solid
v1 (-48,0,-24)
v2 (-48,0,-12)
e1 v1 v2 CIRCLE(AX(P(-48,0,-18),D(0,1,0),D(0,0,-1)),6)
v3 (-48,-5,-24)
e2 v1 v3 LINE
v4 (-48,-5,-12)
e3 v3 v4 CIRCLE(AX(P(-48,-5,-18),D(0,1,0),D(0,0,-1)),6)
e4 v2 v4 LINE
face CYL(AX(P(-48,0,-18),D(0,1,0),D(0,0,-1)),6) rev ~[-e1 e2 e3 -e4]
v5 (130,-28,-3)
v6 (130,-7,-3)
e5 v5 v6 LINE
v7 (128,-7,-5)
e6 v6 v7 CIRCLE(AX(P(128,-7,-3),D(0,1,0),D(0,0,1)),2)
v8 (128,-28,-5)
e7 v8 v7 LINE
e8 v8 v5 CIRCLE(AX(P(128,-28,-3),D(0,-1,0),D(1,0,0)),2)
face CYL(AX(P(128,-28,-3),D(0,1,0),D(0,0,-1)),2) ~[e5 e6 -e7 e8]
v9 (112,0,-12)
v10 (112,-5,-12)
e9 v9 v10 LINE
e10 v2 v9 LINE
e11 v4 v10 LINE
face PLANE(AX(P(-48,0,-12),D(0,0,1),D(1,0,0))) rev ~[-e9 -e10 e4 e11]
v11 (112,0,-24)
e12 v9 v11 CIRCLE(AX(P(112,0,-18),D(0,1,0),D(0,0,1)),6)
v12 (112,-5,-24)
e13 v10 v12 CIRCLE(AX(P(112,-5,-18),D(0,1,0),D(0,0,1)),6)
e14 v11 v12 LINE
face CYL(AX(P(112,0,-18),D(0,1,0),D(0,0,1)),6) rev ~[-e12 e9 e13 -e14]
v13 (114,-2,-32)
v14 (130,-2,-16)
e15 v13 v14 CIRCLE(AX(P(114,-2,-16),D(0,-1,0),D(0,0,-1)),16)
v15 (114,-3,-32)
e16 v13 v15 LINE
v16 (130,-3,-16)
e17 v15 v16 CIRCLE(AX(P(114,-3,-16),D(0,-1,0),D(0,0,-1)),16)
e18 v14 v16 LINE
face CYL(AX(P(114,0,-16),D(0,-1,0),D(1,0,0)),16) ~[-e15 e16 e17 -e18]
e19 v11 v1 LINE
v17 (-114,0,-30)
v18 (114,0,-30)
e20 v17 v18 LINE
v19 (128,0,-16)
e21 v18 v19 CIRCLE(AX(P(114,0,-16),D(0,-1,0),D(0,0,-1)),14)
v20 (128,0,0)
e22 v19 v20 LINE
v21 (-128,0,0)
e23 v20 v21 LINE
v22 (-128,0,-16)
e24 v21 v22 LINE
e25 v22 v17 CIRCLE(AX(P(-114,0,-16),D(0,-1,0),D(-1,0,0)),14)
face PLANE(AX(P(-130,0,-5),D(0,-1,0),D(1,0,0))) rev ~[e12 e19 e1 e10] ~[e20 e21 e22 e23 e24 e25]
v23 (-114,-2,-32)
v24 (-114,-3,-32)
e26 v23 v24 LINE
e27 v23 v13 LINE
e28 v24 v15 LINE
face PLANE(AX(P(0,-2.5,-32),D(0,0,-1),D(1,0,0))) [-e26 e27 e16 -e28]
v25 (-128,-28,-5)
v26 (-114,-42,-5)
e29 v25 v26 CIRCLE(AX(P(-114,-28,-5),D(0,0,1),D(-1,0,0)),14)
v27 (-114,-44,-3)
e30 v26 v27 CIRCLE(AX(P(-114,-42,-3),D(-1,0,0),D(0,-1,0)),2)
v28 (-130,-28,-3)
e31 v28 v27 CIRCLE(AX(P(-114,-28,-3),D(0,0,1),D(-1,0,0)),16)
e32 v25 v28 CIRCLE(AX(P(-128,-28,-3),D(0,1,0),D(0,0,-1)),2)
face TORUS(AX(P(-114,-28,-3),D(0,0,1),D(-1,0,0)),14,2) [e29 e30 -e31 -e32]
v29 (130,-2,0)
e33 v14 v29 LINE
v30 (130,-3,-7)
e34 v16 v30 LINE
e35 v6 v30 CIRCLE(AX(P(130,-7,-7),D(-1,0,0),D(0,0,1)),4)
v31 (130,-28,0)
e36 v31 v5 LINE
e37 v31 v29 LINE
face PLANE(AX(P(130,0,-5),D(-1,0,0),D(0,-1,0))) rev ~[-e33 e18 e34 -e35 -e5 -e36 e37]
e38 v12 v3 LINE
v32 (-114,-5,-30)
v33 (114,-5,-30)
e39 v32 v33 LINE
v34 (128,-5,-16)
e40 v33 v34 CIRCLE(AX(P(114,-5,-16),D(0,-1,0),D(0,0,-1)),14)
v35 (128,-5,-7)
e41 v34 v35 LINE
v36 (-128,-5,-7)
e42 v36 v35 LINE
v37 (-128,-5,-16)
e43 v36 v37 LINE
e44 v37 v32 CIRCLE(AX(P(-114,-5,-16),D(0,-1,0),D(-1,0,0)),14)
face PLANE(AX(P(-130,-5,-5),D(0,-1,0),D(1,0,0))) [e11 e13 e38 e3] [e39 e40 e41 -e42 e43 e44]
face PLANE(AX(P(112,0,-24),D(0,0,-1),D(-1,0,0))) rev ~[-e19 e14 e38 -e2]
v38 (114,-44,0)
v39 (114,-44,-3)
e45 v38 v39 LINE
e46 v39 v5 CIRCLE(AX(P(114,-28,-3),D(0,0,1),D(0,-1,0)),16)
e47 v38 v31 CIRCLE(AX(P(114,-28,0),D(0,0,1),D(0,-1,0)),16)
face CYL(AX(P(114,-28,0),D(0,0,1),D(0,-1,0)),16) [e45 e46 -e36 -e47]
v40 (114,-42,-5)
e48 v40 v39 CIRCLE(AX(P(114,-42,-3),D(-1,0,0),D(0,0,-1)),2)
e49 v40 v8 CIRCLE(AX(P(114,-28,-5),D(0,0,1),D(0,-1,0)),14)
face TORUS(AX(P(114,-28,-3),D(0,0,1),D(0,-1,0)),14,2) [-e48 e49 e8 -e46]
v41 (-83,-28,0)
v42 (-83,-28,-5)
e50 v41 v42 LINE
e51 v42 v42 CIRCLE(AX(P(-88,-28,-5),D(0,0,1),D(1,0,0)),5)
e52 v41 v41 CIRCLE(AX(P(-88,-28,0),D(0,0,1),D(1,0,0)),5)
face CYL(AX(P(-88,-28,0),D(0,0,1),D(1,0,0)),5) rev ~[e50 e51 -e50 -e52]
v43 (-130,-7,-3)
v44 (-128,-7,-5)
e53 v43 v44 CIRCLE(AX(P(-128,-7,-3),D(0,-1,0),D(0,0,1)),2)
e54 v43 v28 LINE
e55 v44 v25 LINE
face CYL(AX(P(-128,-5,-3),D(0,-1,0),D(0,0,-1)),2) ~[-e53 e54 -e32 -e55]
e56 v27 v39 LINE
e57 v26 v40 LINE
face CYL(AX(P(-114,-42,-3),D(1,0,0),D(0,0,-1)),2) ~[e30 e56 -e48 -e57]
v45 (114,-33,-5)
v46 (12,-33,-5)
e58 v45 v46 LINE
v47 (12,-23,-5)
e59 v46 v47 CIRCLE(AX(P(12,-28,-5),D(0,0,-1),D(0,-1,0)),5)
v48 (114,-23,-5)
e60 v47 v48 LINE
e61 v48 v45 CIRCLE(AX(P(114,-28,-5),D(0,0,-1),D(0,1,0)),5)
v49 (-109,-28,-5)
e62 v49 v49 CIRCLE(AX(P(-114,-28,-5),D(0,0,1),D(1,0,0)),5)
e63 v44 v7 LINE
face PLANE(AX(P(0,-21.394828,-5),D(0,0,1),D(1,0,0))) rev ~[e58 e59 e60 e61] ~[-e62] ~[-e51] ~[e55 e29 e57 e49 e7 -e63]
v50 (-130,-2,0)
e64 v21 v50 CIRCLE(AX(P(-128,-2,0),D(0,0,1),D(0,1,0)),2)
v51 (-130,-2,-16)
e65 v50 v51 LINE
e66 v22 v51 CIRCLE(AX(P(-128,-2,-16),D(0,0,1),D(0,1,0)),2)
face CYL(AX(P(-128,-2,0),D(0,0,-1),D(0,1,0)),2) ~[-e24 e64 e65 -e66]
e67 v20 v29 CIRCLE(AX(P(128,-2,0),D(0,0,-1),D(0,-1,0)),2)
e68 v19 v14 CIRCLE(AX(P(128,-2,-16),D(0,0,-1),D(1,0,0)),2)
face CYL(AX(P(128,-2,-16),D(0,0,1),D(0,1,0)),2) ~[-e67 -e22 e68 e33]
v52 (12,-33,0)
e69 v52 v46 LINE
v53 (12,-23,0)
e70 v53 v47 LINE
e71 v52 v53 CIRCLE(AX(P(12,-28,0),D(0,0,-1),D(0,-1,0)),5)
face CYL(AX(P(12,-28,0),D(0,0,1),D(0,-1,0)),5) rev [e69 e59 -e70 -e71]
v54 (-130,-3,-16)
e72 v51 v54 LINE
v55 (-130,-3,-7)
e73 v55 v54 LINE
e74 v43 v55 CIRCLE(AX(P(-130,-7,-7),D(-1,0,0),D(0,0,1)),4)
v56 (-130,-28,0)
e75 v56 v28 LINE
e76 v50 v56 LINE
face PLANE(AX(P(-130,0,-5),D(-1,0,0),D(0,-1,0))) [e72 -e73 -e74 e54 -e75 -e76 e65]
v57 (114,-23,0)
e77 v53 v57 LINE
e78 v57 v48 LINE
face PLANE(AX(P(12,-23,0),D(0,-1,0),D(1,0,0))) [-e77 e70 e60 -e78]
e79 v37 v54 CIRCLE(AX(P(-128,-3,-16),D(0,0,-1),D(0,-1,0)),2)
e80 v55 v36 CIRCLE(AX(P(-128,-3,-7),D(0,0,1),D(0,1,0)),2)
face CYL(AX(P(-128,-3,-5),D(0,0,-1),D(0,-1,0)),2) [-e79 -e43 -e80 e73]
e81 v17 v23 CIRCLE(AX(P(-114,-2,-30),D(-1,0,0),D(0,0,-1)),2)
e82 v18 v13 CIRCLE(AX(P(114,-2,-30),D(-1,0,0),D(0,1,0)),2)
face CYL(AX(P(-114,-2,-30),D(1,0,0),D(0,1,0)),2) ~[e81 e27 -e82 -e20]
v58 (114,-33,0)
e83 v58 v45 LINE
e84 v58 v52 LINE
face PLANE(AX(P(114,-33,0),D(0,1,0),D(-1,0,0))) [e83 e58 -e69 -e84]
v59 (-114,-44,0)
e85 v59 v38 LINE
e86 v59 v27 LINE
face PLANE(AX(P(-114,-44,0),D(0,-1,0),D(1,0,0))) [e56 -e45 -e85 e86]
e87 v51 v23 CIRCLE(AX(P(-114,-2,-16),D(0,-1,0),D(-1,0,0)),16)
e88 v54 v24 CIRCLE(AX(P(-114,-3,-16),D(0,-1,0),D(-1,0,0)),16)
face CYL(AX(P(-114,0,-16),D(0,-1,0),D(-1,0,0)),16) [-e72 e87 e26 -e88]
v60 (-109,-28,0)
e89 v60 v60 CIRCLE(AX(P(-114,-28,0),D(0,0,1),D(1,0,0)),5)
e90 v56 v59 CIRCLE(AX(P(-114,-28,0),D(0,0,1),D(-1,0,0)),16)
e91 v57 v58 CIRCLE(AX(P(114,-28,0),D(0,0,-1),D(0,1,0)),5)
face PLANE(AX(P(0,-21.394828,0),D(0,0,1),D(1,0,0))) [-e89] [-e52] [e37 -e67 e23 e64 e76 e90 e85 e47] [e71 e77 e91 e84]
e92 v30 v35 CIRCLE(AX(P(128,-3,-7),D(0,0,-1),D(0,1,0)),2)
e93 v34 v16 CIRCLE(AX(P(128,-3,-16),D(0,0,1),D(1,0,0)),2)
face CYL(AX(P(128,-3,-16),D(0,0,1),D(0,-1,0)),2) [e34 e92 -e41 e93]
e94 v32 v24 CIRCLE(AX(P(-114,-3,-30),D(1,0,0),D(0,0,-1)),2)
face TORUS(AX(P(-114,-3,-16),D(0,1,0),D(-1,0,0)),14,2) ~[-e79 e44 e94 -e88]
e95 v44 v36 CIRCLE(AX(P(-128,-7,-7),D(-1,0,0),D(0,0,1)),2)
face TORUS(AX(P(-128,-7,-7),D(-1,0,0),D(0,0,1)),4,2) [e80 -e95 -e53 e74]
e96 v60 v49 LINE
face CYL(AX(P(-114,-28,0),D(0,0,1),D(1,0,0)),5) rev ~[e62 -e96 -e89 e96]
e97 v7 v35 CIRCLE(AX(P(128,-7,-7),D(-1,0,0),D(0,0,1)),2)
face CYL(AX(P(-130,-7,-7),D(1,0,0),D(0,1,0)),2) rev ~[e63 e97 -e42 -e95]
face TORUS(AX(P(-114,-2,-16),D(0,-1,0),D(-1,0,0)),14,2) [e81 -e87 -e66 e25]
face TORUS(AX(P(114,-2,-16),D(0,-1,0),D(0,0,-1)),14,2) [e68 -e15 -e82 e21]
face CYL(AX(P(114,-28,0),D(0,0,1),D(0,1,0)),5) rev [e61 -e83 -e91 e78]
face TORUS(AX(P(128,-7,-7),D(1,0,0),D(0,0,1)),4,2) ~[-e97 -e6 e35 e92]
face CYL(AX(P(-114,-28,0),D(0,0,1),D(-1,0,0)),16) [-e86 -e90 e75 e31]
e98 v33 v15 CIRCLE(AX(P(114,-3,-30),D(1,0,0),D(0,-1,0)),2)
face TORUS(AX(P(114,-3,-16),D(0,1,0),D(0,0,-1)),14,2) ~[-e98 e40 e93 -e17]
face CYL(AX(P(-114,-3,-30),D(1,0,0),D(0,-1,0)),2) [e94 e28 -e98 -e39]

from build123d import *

# Parameters (mm, degrees)
F0_R     = 5
F1_DEPTH = 5
F2_W     = 260
F2_H     = 5
F3_DEPTH = 27
F4_R     = 16
F6_DEPTH = 5
F7_R     = 2


with BuildPart() as f1:
    # F0 (on Top) → F1 (new body)
    with BuildSketch(Plane.XY):
        with BuildLine():
            Line((130, -28), (130, 0))
            Line((130, 0), (-130, 0))
            Line((-130, 0), (-130, -28))
            ThreePointArc((-130, -28), (-125.313708499, -39.313708499), (-114, -44))
            Line((-114, -44), (114, -44))
            ThreePointArc((114, -44), (125.313708499, -39.313708499), (130, -28))
        make_face()
        with Locations((-114, -28)):
            Circle(F0_R, mode=Mode.SUBTRACT)
        with Locations((-88, -28)):
            Circle(F0_R, mode=Mode.SUBTRACT)
        with BuildLine():
            Line((12, -23), (114, -23))
            ThreePointArc((114, -23), (119, -28), (114, -33))
            Line((114, -33), (12, -33))
            ThreePointArc((12, -33), (7, -28), (12, -23))
        make_face(mode=Mode.SUBTRACT)
    extrude(amount=-F1_DEPTH)

    # F2 (on face) → F3 (join)
    with BuildSketch(Plane(origin=(0, 0, -5), x_dir=(1, 0, 0), z_dir=(0, 0, -1))):
        with Locations((0, 2.5)):
            Rectangle(F2_W, F2_H)
    extrude(amount=F3_DEPTH)

    # F4
    f4_edges = [f1.edges().sort_by_distance(p)[0] for p in [
        (130, -2.5, -32),
        (-130, -2.5, -32),
    ]]
    fillet(f4_edges, radius=F4_R)

    # F5 (on face) → F6 (cut)
    with BuildSketch(Plane(origin=(0, 0, 0), x_dir=(-1, 0, 0), z_dir=(0, 1, 0))):
        with BuildLine():
            ThreePointArc((48, -24), (54, -18), (48, -12))
            Line((48, -12), (-112, -12))
            ThreePointArc((-112, -12), (-118, -18), (-112, -24))
            Line((-112, -24), (48, -24))
        make_face()
    extrude(amount=-F6_DEPTH, mode=Mode.SUBTRACT)

    # F7
    f7_edges = [f1.edges().sort_by_distance(p)[0] for p in [
        (0, 0, -32),
        (-125.313708, -5, -27.313708),
        (0, -5, -5),
        (130, -5, -10.5),
        (130, -16.5, -5),
        (130, 0, -8),
        (125.313708, -5, -27.313708),
        (0, -5, -32),
        (-130, -5, -10.5),
        (125.313708, 0, -27.313708),
        (125.313708, -39.313708, -5),
        (0, -44, -5),
        (-125.313708, -39.313708, -5),
        (-130, -16.5, -5),
        (-130, 0, -8),
        (-125.313708, 0, -27.313708),
    ]]
    fillet(f7_edges, radius=F7_R)


solid = f1.part
